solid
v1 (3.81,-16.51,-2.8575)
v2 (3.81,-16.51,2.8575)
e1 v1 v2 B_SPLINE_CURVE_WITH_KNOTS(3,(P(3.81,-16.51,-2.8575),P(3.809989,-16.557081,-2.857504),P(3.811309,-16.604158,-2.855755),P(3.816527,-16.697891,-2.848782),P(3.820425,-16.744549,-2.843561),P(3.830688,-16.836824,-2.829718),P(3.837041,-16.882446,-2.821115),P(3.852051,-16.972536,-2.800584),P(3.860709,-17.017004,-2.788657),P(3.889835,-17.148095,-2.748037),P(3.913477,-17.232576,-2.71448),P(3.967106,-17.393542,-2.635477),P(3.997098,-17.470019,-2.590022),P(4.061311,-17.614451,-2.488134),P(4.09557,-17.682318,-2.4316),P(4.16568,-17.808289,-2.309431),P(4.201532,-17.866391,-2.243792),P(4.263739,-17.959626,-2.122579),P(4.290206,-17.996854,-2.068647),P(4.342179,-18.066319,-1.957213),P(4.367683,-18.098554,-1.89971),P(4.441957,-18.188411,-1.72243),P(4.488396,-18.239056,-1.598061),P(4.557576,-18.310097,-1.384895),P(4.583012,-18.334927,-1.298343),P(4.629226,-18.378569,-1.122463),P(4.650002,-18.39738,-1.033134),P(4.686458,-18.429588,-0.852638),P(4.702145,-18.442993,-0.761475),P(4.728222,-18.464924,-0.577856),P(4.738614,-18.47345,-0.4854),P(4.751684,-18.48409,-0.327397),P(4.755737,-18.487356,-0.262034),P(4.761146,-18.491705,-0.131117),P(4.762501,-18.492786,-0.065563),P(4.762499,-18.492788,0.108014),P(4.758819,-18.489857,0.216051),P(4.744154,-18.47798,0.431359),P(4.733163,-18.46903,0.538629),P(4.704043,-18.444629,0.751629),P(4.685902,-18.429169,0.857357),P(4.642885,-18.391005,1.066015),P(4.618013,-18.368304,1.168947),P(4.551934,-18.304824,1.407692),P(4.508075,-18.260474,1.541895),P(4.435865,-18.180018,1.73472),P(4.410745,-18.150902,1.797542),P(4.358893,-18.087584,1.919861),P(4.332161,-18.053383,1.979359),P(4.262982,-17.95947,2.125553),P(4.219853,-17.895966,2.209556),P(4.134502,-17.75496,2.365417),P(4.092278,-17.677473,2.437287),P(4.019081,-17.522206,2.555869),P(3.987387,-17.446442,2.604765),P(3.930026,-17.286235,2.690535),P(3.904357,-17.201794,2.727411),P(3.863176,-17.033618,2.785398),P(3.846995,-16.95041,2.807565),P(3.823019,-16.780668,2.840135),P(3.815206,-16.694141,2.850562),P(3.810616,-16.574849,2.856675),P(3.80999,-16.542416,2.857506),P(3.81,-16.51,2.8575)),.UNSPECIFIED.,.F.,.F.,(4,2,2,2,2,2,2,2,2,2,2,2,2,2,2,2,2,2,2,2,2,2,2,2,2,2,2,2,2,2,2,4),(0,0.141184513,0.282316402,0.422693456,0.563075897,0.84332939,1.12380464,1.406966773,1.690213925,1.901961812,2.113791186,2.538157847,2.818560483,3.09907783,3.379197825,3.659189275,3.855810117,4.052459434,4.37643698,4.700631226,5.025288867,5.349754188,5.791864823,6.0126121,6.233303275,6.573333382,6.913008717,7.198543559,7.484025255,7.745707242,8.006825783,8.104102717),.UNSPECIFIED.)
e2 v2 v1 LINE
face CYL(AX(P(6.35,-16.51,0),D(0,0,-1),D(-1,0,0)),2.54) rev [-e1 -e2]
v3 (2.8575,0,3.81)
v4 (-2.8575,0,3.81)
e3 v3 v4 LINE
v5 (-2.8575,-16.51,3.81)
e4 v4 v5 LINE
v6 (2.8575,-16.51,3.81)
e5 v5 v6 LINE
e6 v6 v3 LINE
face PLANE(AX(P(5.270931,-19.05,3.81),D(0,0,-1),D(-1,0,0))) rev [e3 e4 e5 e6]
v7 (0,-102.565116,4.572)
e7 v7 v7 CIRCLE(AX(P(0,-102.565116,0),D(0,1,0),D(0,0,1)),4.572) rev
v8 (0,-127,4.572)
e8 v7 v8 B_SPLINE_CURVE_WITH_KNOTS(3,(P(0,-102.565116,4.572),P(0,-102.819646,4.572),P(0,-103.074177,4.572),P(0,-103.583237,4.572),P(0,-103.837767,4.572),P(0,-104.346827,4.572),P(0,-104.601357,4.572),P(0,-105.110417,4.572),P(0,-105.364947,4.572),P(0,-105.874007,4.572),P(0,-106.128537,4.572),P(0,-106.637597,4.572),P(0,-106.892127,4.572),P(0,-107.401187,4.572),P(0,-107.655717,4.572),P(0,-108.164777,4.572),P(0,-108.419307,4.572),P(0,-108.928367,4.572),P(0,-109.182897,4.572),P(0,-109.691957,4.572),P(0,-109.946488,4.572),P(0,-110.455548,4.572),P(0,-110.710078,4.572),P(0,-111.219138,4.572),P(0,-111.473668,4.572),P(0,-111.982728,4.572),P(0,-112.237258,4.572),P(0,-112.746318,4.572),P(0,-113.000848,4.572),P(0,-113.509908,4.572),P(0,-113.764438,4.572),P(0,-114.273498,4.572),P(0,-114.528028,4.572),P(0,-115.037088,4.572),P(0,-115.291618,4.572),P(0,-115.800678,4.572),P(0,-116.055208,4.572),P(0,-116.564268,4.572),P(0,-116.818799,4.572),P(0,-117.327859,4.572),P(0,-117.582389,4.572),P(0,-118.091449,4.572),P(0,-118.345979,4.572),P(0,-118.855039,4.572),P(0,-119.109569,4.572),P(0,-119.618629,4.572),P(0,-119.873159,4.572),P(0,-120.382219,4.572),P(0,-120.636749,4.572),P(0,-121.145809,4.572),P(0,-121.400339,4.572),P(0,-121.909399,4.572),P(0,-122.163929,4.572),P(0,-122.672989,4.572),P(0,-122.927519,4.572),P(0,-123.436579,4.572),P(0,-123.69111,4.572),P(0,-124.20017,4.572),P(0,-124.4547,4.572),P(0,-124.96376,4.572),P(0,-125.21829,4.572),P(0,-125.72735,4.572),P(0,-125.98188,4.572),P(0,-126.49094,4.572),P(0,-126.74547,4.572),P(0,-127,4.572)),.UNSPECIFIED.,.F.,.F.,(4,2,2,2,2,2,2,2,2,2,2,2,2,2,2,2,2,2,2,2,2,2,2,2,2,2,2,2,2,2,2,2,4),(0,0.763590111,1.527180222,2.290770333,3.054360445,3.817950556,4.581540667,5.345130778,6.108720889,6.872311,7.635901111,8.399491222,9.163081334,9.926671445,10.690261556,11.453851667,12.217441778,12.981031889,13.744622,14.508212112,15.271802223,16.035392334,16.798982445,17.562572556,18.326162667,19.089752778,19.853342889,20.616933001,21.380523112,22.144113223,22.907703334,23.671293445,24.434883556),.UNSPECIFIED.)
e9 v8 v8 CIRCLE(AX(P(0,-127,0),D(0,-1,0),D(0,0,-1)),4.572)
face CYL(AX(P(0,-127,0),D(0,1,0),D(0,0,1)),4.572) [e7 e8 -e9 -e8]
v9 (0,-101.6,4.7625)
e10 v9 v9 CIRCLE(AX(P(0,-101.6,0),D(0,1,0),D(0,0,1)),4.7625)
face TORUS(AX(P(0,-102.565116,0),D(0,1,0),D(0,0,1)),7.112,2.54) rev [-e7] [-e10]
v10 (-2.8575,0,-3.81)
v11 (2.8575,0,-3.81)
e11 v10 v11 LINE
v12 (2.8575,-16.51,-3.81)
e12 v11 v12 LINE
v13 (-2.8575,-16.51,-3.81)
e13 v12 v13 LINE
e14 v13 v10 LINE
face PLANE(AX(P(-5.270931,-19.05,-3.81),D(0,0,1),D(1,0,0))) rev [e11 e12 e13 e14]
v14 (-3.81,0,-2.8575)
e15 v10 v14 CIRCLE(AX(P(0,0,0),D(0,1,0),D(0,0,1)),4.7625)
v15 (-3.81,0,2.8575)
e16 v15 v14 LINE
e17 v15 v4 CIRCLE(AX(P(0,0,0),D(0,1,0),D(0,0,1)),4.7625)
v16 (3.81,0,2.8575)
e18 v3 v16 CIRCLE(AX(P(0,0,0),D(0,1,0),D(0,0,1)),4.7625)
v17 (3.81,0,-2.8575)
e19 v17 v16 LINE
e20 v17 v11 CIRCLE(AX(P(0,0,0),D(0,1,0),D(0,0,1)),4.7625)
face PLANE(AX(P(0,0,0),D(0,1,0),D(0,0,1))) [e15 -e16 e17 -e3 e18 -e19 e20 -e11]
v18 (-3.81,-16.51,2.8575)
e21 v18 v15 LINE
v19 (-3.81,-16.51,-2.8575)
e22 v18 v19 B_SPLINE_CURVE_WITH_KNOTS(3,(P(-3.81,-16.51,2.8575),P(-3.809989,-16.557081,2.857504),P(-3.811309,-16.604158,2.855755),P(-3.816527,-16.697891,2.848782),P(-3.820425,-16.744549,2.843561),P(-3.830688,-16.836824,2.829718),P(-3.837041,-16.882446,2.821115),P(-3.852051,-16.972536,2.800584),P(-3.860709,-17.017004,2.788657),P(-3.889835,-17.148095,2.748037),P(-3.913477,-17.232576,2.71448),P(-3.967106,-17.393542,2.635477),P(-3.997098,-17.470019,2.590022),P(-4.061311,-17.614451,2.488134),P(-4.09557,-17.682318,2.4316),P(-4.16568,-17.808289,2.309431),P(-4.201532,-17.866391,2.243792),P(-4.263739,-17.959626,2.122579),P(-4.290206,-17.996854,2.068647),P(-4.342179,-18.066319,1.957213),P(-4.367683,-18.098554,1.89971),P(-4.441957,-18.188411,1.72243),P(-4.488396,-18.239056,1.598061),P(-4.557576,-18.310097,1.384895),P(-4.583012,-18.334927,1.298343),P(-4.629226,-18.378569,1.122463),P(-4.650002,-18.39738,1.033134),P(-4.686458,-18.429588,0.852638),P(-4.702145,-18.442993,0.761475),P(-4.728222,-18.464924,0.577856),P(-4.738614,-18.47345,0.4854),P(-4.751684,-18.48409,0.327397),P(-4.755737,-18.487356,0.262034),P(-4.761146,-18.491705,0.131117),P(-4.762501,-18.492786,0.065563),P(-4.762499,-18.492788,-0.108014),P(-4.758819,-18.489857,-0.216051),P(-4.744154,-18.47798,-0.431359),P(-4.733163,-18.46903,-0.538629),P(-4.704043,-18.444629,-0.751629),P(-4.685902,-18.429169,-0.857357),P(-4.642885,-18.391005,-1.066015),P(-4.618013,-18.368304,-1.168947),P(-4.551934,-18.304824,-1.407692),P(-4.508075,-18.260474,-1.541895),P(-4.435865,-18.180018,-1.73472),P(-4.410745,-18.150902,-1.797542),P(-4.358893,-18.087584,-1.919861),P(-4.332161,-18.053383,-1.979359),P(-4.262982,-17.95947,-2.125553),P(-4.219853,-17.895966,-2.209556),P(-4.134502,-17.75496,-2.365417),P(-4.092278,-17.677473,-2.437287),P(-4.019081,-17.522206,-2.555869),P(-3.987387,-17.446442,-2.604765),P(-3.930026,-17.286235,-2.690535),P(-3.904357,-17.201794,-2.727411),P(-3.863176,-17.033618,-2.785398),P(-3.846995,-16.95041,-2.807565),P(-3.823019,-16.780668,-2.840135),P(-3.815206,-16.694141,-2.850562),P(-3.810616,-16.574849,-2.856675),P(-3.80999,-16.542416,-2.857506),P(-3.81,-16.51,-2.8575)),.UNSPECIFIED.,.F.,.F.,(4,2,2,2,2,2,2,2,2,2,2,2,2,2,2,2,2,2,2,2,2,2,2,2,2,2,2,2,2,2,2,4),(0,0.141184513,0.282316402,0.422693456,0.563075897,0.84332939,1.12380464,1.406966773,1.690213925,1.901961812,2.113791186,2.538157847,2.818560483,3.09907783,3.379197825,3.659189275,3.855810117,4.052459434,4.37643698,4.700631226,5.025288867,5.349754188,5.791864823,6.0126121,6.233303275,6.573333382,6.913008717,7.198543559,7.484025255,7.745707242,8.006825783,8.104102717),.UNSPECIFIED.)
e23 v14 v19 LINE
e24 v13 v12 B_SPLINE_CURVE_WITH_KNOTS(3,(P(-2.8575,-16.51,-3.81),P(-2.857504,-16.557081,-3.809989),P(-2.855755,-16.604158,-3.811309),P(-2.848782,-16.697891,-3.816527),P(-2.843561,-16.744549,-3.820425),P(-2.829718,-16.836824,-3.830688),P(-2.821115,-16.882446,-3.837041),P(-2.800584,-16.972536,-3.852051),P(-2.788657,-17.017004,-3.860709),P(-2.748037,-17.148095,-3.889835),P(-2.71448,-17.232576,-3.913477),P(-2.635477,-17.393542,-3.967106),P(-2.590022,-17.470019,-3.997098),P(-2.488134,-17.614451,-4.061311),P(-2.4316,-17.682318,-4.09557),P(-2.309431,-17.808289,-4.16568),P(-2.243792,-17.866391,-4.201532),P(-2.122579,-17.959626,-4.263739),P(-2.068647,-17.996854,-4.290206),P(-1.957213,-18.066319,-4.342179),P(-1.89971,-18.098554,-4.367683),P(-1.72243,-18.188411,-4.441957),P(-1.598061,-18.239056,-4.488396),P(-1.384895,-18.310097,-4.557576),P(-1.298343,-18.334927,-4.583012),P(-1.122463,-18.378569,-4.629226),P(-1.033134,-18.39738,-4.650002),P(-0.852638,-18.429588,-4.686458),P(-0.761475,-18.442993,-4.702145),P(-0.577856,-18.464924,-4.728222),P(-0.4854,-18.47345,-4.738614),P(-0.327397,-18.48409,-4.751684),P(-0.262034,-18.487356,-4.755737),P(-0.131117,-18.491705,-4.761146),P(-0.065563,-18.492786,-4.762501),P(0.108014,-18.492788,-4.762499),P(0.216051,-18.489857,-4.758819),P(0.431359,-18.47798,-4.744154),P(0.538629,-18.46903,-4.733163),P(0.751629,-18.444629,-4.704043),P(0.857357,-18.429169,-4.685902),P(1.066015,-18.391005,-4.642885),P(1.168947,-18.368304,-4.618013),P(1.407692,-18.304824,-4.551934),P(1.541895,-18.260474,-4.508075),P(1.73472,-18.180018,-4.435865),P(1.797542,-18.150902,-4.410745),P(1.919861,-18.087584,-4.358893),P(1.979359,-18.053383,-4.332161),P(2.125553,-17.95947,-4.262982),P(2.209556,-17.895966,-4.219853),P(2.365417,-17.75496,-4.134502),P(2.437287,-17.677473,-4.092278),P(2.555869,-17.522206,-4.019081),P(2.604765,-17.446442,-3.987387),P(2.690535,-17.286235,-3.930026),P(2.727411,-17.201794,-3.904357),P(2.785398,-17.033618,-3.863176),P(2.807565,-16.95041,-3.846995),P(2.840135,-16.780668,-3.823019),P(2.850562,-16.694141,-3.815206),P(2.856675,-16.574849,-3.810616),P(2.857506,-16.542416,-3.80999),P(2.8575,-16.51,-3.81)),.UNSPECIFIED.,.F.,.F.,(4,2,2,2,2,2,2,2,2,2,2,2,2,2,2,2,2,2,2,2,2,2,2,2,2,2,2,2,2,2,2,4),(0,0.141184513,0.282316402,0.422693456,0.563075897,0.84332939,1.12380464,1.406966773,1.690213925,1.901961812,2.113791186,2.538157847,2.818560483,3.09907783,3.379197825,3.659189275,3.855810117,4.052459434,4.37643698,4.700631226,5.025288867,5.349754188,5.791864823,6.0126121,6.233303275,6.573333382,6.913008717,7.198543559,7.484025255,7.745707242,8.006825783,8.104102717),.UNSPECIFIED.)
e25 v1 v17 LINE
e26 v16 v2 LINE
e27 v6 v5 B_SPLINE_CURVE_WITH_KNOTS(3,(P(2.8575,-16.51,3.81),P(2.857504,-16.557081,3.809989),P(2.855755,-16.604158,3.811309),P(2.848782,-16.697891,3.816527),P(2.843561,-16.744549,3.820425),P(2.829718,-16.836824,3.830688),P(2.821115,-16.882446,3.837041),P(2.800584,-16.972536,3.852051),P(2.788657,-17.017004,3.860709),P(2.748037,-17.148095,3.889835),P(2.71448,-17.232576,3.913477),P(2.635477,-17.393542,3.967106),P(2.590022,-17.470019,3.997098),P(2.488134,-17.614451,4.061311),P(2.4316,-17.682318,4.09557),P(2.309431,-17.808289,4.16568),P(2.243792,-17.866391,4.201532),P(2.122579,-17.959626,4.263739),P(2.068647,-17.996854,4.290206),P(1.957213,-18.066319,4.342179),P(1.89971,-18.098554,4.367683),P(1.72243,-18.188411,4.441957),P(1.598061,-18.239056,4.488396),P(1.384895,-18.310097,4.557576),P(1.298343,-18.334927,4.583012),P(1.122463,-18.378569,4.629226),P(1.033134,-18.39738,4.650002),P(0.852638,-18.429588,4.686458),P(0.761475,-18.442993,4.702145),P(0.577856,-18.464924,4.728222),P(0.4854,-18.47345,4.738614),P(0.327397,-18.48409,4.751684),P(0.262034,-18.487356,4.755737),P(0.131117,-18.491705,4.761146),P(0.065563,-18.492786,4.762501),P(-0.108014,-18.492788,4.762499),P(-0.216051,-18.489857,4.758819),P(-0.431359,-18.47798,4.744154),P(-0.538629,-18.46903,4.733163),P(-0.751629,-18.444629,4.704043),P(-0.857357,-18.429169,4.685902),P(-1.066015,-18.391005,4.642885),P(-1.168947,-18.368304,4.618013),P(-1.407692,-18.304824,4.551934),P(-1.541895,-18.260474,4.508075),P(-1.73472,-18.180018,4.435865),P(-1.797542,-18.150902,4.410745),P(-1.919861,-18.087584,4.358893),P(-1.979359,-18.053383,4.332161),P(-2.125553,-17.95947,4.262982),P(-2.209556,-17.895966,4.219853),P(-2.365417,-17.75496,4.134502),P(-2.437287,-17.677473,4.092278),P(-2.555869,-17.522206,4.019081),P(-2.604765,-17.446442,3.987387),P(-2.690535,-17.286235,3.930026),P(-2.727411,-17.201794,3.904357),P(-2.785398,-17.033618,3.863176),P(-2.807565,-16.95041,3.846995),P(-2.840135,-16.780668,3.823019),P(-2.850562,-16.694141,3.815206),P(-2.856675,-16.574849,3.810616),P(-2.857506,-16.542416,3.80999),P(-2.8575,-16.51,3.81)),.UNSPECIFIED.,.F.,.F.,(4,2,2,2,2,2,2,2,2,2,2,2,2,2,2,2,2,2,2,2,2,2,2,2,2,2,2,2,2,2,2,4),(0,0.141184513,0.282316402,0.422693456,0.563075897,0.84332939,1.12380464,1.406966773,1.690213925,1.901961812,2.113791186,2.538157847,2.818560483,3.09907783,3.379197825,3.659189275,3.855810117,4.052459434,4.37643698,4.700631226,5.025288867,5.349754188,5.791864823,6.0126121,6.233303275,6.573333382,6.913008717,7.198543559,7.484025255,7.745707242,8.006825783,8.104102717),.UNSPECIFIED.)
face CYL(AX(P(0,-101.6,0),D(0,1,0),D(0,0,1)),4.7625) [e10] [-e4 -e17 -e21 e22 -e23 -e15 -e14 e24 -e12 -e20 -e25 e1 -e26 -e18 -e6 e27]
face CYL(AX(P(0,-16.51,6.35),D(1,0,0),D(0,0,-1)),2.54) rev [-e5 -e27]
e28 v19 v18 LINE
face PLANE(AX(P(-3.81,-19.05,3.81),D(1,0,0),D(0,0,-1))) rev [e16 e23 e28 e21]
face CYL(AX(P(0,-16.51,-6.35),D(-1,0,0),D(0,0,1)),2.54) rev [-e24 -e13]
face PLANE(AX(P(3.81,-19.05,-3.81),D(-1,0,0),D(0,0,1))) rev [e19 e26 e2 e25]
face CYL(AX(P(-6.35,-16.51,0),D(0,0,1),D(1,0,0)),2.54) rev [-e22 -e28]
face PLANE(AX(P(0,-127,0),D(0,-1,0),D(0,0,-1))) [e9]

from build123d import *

# Parameters (mm, degrees)
SKETCH1_R           = 4.7625
BOSS_EXTRUDE1_DEPTH = 101.6
SKETCH2_W           = 11.315378495
SKETCH2_H           = 2.135355531
CUT_EXTRUDE1_DEPTH  = 19.05
SKETCH3_W           = 2.441021898
SKETCH3_H           = 8.016208274
CUT_EXTRUDE2_DEPTH  = 19.05
FILLET1_R           = 2.54
SKETCH4_R           = 4.572
BOSS_EXTRUDE2_DEPTH = 25.4
FILLET2_R           = 2.54


with BuildPart() as part:
    # Sketch1 → Boss-Extrude1 (new body)
    with BuildSketch(Plane(origin=(0, 0, 0), x_dir=(1, 0, 0), z_dir=(0, 1, 0))):
        with Locations(Location((0, 0, 0), (0, 0, 270))):
            Circle(SKETCH1_R)
    extrude(amount=-BOSS_EXTRUDE1_DEPTH)

    # Sketch2 → Cut-Extrude1 (cut)
    with BuildSketch(Plane(origin=(0, 0, 0), x_dir=(1, 0, 0), z_dir=(0, 1, 0))):
        with Locations((0.38675801, 4.877677766)):
            Rectangle(SKETCH2_W, SKETCH2_H)
        with Locations((-0.38675801, -4.877677766)):
            Rectangle(SKETCH2_W, SKETCH2_H)
    extrude(amount=-CUT_EXTRUDE1_DEPTH, mode=Mode.SUBTRACT)

    # Sketch3 → Cut-Extrude2 (cut)
    with BuildSketch(Plane(origin=(0, 0, 0), x_dir=(1, 0, 0), z_dir=(0, 1, 0))):
        with Locations((5.030510949, -0.198104137)):
            Rectangle(SKETCH3_W, SKETCH3_H)
        with Locations((-5.030510949, 0.198104137)):
            Rectangle(SKETCH3_W, SKETCH3_H)
    extrude(amount=-CUT_EXTRUDE2_DEPTH, mode=Mode.SUBTRACT)

    # Fillet1
    # the kernel refuses this fillet: 2.54 mm, written as the material it adds along each edge
    with BuildSketch(Plane(origin=(9.2075, -19.05, -3.81), x_dir=(0, 1, 0), z_dir=(-1, 0, 0))) as fillet1_piece_1_section:
        with BuildLine():
            CenterArc((FILLET1_R, FILLET1_R), FILLET1_R, 180, 90)
            Line((0, FILLET1_R), (0, 0))
            Line((0, 0), (FILLET1_R, 0))
        make_face()
    fillet1_piece_1 = extrude(amount=18.415, mode=Mode.PRIVATE)
    fillet1_piece_1 = fillet1_piece_1 & Plane(origin=(0, -18.276812149, 0), x_dir=(0, 0, 1), z_dir=(0, 1, 0)) * Cylinder(4.7625, 47, mode=Mode.PRIVATE)
    add(fillet1_piece_1)
    with BuildSketch(Plane(origin=(3.81, -19.05, 9.2075), x_dir=(0, 1, 0), z_dir=(0, 0, -1))) as fillet1_piece_2_section:
        with BuildLine():
            CenterArc((FILLET1_R, FILLET1_R), FILLET1_R, 180, 90)
            Line((0, FILLET1_R), (0, 0))
            Line((0, 0), (FILLET1_R, 0))
        make_face()
    fillet1_piece_2 = extrude(amount=18.415, mode=Mode.PRIVATE)
    fillet1_piece_2 = fillet1_piece_2 & Plane(origin=(0, -18.276812149, 0), x_dir=(0, 0, 1), z_dir=(0, 1, 0)) * Cylinder(4.7625, 47, mode=Mode.PRIVATE)
    add(fillet1_piece_2)
    with BuildSketch(Plane(origin=(-3.81, -19.05, -9.2075), x_dir=(0, 1, 0), z_dir=(0, 0, 1))) as fillet1_piece_3_section:
        with BuildLine():
            CenterArc((FILLET1_R, FILLET1_R), FILLET1_R, 180, 90)
            Line((0, FILLET1_R), (0, 0))
            Line((0, 0), (FILLET1_R, 0))
        make_face()
    fillet1_piece_3 = extrude(amount=18.415, mode=Mode.PRIVATE)
    fillet1_piece_3 = fillet1_piece_3 & Plane(origin=(0, -18.276812149, 0), x_dir=(0, 0, 1), z_dir=(0, 1, 0)) * Cylinder(4.7625, 47, mode=Mode.PRIVATE)
    add(fillet1_piece_3)
    with BuildSketch(Plane(origin=(9.2075, -19.05, 3.81), x_dir=(0, 0, 1), z_dir=(-1, 0, 0))) as fillet1_piece_4_section:
        with BuildLine():
            CenterArc((FILLET1_R, FILLET1_R), FILLET1_R, 180, 90)
            Line((0, FILLET1_R), (0, 0))
            Line((0, 0), (FILLET1_R, 0))
        make_face()
    fillet1_piece_4 = extrude(amount=18.415, mode=Mode.PRIVATE)
    fillet1_piece_4 = fillet1_piece_4 & Plane(origin=(0, -18.276814904, 0), x_dir=(0, 0, 1), z_dir=(0, 1, 0)) * Cylinder(4.7625, 47, mode=Mode.PRIVATE)
    add(fillet1_piece_4)

    # Sketch4 → Boss-Extrude2 (add)
    with BuildSketch(Plane.XZ.offset(101.6)):
        with Locations(Location((0, 0, 0), (0, 0, 270))):
            Circle(SKETCH4_R)
    extrude(amount=BOSS_EXTRUDE2_DEPTH)

    # Fillet2
    # the kernel refuses this fillet: 2.54 mm, written as the material it adds along each edge
    with BuildSketch(Plane(origin=(0, -101.6, 0), x_dir=(0, 0, -1), z_dir=(-1, 0, 0))) as fillet2_piece_1:
        with BuildLine():
            CenterArc((7.112, 0.965116444), FILLET2_R, 180, 22.331645009)
            Line((4.572, 0.965116444), (4.5212, 0.965116444))
            Line((4.5212, 0.965116444), (4.5212, 0))
            Line((4.5212, 0), (4.572, -0.0508))
            ThreePointArc((4.572, -0.0508), (4.66725, -0.0508), (4.71551, -0.019302329))
            Line((4.71551, -0.019302329), (4.7625, 0))
        make_face()
    revolve(axis=Axis((0, -101.6, 0), (0, -1, 0)))


solid = part.part
